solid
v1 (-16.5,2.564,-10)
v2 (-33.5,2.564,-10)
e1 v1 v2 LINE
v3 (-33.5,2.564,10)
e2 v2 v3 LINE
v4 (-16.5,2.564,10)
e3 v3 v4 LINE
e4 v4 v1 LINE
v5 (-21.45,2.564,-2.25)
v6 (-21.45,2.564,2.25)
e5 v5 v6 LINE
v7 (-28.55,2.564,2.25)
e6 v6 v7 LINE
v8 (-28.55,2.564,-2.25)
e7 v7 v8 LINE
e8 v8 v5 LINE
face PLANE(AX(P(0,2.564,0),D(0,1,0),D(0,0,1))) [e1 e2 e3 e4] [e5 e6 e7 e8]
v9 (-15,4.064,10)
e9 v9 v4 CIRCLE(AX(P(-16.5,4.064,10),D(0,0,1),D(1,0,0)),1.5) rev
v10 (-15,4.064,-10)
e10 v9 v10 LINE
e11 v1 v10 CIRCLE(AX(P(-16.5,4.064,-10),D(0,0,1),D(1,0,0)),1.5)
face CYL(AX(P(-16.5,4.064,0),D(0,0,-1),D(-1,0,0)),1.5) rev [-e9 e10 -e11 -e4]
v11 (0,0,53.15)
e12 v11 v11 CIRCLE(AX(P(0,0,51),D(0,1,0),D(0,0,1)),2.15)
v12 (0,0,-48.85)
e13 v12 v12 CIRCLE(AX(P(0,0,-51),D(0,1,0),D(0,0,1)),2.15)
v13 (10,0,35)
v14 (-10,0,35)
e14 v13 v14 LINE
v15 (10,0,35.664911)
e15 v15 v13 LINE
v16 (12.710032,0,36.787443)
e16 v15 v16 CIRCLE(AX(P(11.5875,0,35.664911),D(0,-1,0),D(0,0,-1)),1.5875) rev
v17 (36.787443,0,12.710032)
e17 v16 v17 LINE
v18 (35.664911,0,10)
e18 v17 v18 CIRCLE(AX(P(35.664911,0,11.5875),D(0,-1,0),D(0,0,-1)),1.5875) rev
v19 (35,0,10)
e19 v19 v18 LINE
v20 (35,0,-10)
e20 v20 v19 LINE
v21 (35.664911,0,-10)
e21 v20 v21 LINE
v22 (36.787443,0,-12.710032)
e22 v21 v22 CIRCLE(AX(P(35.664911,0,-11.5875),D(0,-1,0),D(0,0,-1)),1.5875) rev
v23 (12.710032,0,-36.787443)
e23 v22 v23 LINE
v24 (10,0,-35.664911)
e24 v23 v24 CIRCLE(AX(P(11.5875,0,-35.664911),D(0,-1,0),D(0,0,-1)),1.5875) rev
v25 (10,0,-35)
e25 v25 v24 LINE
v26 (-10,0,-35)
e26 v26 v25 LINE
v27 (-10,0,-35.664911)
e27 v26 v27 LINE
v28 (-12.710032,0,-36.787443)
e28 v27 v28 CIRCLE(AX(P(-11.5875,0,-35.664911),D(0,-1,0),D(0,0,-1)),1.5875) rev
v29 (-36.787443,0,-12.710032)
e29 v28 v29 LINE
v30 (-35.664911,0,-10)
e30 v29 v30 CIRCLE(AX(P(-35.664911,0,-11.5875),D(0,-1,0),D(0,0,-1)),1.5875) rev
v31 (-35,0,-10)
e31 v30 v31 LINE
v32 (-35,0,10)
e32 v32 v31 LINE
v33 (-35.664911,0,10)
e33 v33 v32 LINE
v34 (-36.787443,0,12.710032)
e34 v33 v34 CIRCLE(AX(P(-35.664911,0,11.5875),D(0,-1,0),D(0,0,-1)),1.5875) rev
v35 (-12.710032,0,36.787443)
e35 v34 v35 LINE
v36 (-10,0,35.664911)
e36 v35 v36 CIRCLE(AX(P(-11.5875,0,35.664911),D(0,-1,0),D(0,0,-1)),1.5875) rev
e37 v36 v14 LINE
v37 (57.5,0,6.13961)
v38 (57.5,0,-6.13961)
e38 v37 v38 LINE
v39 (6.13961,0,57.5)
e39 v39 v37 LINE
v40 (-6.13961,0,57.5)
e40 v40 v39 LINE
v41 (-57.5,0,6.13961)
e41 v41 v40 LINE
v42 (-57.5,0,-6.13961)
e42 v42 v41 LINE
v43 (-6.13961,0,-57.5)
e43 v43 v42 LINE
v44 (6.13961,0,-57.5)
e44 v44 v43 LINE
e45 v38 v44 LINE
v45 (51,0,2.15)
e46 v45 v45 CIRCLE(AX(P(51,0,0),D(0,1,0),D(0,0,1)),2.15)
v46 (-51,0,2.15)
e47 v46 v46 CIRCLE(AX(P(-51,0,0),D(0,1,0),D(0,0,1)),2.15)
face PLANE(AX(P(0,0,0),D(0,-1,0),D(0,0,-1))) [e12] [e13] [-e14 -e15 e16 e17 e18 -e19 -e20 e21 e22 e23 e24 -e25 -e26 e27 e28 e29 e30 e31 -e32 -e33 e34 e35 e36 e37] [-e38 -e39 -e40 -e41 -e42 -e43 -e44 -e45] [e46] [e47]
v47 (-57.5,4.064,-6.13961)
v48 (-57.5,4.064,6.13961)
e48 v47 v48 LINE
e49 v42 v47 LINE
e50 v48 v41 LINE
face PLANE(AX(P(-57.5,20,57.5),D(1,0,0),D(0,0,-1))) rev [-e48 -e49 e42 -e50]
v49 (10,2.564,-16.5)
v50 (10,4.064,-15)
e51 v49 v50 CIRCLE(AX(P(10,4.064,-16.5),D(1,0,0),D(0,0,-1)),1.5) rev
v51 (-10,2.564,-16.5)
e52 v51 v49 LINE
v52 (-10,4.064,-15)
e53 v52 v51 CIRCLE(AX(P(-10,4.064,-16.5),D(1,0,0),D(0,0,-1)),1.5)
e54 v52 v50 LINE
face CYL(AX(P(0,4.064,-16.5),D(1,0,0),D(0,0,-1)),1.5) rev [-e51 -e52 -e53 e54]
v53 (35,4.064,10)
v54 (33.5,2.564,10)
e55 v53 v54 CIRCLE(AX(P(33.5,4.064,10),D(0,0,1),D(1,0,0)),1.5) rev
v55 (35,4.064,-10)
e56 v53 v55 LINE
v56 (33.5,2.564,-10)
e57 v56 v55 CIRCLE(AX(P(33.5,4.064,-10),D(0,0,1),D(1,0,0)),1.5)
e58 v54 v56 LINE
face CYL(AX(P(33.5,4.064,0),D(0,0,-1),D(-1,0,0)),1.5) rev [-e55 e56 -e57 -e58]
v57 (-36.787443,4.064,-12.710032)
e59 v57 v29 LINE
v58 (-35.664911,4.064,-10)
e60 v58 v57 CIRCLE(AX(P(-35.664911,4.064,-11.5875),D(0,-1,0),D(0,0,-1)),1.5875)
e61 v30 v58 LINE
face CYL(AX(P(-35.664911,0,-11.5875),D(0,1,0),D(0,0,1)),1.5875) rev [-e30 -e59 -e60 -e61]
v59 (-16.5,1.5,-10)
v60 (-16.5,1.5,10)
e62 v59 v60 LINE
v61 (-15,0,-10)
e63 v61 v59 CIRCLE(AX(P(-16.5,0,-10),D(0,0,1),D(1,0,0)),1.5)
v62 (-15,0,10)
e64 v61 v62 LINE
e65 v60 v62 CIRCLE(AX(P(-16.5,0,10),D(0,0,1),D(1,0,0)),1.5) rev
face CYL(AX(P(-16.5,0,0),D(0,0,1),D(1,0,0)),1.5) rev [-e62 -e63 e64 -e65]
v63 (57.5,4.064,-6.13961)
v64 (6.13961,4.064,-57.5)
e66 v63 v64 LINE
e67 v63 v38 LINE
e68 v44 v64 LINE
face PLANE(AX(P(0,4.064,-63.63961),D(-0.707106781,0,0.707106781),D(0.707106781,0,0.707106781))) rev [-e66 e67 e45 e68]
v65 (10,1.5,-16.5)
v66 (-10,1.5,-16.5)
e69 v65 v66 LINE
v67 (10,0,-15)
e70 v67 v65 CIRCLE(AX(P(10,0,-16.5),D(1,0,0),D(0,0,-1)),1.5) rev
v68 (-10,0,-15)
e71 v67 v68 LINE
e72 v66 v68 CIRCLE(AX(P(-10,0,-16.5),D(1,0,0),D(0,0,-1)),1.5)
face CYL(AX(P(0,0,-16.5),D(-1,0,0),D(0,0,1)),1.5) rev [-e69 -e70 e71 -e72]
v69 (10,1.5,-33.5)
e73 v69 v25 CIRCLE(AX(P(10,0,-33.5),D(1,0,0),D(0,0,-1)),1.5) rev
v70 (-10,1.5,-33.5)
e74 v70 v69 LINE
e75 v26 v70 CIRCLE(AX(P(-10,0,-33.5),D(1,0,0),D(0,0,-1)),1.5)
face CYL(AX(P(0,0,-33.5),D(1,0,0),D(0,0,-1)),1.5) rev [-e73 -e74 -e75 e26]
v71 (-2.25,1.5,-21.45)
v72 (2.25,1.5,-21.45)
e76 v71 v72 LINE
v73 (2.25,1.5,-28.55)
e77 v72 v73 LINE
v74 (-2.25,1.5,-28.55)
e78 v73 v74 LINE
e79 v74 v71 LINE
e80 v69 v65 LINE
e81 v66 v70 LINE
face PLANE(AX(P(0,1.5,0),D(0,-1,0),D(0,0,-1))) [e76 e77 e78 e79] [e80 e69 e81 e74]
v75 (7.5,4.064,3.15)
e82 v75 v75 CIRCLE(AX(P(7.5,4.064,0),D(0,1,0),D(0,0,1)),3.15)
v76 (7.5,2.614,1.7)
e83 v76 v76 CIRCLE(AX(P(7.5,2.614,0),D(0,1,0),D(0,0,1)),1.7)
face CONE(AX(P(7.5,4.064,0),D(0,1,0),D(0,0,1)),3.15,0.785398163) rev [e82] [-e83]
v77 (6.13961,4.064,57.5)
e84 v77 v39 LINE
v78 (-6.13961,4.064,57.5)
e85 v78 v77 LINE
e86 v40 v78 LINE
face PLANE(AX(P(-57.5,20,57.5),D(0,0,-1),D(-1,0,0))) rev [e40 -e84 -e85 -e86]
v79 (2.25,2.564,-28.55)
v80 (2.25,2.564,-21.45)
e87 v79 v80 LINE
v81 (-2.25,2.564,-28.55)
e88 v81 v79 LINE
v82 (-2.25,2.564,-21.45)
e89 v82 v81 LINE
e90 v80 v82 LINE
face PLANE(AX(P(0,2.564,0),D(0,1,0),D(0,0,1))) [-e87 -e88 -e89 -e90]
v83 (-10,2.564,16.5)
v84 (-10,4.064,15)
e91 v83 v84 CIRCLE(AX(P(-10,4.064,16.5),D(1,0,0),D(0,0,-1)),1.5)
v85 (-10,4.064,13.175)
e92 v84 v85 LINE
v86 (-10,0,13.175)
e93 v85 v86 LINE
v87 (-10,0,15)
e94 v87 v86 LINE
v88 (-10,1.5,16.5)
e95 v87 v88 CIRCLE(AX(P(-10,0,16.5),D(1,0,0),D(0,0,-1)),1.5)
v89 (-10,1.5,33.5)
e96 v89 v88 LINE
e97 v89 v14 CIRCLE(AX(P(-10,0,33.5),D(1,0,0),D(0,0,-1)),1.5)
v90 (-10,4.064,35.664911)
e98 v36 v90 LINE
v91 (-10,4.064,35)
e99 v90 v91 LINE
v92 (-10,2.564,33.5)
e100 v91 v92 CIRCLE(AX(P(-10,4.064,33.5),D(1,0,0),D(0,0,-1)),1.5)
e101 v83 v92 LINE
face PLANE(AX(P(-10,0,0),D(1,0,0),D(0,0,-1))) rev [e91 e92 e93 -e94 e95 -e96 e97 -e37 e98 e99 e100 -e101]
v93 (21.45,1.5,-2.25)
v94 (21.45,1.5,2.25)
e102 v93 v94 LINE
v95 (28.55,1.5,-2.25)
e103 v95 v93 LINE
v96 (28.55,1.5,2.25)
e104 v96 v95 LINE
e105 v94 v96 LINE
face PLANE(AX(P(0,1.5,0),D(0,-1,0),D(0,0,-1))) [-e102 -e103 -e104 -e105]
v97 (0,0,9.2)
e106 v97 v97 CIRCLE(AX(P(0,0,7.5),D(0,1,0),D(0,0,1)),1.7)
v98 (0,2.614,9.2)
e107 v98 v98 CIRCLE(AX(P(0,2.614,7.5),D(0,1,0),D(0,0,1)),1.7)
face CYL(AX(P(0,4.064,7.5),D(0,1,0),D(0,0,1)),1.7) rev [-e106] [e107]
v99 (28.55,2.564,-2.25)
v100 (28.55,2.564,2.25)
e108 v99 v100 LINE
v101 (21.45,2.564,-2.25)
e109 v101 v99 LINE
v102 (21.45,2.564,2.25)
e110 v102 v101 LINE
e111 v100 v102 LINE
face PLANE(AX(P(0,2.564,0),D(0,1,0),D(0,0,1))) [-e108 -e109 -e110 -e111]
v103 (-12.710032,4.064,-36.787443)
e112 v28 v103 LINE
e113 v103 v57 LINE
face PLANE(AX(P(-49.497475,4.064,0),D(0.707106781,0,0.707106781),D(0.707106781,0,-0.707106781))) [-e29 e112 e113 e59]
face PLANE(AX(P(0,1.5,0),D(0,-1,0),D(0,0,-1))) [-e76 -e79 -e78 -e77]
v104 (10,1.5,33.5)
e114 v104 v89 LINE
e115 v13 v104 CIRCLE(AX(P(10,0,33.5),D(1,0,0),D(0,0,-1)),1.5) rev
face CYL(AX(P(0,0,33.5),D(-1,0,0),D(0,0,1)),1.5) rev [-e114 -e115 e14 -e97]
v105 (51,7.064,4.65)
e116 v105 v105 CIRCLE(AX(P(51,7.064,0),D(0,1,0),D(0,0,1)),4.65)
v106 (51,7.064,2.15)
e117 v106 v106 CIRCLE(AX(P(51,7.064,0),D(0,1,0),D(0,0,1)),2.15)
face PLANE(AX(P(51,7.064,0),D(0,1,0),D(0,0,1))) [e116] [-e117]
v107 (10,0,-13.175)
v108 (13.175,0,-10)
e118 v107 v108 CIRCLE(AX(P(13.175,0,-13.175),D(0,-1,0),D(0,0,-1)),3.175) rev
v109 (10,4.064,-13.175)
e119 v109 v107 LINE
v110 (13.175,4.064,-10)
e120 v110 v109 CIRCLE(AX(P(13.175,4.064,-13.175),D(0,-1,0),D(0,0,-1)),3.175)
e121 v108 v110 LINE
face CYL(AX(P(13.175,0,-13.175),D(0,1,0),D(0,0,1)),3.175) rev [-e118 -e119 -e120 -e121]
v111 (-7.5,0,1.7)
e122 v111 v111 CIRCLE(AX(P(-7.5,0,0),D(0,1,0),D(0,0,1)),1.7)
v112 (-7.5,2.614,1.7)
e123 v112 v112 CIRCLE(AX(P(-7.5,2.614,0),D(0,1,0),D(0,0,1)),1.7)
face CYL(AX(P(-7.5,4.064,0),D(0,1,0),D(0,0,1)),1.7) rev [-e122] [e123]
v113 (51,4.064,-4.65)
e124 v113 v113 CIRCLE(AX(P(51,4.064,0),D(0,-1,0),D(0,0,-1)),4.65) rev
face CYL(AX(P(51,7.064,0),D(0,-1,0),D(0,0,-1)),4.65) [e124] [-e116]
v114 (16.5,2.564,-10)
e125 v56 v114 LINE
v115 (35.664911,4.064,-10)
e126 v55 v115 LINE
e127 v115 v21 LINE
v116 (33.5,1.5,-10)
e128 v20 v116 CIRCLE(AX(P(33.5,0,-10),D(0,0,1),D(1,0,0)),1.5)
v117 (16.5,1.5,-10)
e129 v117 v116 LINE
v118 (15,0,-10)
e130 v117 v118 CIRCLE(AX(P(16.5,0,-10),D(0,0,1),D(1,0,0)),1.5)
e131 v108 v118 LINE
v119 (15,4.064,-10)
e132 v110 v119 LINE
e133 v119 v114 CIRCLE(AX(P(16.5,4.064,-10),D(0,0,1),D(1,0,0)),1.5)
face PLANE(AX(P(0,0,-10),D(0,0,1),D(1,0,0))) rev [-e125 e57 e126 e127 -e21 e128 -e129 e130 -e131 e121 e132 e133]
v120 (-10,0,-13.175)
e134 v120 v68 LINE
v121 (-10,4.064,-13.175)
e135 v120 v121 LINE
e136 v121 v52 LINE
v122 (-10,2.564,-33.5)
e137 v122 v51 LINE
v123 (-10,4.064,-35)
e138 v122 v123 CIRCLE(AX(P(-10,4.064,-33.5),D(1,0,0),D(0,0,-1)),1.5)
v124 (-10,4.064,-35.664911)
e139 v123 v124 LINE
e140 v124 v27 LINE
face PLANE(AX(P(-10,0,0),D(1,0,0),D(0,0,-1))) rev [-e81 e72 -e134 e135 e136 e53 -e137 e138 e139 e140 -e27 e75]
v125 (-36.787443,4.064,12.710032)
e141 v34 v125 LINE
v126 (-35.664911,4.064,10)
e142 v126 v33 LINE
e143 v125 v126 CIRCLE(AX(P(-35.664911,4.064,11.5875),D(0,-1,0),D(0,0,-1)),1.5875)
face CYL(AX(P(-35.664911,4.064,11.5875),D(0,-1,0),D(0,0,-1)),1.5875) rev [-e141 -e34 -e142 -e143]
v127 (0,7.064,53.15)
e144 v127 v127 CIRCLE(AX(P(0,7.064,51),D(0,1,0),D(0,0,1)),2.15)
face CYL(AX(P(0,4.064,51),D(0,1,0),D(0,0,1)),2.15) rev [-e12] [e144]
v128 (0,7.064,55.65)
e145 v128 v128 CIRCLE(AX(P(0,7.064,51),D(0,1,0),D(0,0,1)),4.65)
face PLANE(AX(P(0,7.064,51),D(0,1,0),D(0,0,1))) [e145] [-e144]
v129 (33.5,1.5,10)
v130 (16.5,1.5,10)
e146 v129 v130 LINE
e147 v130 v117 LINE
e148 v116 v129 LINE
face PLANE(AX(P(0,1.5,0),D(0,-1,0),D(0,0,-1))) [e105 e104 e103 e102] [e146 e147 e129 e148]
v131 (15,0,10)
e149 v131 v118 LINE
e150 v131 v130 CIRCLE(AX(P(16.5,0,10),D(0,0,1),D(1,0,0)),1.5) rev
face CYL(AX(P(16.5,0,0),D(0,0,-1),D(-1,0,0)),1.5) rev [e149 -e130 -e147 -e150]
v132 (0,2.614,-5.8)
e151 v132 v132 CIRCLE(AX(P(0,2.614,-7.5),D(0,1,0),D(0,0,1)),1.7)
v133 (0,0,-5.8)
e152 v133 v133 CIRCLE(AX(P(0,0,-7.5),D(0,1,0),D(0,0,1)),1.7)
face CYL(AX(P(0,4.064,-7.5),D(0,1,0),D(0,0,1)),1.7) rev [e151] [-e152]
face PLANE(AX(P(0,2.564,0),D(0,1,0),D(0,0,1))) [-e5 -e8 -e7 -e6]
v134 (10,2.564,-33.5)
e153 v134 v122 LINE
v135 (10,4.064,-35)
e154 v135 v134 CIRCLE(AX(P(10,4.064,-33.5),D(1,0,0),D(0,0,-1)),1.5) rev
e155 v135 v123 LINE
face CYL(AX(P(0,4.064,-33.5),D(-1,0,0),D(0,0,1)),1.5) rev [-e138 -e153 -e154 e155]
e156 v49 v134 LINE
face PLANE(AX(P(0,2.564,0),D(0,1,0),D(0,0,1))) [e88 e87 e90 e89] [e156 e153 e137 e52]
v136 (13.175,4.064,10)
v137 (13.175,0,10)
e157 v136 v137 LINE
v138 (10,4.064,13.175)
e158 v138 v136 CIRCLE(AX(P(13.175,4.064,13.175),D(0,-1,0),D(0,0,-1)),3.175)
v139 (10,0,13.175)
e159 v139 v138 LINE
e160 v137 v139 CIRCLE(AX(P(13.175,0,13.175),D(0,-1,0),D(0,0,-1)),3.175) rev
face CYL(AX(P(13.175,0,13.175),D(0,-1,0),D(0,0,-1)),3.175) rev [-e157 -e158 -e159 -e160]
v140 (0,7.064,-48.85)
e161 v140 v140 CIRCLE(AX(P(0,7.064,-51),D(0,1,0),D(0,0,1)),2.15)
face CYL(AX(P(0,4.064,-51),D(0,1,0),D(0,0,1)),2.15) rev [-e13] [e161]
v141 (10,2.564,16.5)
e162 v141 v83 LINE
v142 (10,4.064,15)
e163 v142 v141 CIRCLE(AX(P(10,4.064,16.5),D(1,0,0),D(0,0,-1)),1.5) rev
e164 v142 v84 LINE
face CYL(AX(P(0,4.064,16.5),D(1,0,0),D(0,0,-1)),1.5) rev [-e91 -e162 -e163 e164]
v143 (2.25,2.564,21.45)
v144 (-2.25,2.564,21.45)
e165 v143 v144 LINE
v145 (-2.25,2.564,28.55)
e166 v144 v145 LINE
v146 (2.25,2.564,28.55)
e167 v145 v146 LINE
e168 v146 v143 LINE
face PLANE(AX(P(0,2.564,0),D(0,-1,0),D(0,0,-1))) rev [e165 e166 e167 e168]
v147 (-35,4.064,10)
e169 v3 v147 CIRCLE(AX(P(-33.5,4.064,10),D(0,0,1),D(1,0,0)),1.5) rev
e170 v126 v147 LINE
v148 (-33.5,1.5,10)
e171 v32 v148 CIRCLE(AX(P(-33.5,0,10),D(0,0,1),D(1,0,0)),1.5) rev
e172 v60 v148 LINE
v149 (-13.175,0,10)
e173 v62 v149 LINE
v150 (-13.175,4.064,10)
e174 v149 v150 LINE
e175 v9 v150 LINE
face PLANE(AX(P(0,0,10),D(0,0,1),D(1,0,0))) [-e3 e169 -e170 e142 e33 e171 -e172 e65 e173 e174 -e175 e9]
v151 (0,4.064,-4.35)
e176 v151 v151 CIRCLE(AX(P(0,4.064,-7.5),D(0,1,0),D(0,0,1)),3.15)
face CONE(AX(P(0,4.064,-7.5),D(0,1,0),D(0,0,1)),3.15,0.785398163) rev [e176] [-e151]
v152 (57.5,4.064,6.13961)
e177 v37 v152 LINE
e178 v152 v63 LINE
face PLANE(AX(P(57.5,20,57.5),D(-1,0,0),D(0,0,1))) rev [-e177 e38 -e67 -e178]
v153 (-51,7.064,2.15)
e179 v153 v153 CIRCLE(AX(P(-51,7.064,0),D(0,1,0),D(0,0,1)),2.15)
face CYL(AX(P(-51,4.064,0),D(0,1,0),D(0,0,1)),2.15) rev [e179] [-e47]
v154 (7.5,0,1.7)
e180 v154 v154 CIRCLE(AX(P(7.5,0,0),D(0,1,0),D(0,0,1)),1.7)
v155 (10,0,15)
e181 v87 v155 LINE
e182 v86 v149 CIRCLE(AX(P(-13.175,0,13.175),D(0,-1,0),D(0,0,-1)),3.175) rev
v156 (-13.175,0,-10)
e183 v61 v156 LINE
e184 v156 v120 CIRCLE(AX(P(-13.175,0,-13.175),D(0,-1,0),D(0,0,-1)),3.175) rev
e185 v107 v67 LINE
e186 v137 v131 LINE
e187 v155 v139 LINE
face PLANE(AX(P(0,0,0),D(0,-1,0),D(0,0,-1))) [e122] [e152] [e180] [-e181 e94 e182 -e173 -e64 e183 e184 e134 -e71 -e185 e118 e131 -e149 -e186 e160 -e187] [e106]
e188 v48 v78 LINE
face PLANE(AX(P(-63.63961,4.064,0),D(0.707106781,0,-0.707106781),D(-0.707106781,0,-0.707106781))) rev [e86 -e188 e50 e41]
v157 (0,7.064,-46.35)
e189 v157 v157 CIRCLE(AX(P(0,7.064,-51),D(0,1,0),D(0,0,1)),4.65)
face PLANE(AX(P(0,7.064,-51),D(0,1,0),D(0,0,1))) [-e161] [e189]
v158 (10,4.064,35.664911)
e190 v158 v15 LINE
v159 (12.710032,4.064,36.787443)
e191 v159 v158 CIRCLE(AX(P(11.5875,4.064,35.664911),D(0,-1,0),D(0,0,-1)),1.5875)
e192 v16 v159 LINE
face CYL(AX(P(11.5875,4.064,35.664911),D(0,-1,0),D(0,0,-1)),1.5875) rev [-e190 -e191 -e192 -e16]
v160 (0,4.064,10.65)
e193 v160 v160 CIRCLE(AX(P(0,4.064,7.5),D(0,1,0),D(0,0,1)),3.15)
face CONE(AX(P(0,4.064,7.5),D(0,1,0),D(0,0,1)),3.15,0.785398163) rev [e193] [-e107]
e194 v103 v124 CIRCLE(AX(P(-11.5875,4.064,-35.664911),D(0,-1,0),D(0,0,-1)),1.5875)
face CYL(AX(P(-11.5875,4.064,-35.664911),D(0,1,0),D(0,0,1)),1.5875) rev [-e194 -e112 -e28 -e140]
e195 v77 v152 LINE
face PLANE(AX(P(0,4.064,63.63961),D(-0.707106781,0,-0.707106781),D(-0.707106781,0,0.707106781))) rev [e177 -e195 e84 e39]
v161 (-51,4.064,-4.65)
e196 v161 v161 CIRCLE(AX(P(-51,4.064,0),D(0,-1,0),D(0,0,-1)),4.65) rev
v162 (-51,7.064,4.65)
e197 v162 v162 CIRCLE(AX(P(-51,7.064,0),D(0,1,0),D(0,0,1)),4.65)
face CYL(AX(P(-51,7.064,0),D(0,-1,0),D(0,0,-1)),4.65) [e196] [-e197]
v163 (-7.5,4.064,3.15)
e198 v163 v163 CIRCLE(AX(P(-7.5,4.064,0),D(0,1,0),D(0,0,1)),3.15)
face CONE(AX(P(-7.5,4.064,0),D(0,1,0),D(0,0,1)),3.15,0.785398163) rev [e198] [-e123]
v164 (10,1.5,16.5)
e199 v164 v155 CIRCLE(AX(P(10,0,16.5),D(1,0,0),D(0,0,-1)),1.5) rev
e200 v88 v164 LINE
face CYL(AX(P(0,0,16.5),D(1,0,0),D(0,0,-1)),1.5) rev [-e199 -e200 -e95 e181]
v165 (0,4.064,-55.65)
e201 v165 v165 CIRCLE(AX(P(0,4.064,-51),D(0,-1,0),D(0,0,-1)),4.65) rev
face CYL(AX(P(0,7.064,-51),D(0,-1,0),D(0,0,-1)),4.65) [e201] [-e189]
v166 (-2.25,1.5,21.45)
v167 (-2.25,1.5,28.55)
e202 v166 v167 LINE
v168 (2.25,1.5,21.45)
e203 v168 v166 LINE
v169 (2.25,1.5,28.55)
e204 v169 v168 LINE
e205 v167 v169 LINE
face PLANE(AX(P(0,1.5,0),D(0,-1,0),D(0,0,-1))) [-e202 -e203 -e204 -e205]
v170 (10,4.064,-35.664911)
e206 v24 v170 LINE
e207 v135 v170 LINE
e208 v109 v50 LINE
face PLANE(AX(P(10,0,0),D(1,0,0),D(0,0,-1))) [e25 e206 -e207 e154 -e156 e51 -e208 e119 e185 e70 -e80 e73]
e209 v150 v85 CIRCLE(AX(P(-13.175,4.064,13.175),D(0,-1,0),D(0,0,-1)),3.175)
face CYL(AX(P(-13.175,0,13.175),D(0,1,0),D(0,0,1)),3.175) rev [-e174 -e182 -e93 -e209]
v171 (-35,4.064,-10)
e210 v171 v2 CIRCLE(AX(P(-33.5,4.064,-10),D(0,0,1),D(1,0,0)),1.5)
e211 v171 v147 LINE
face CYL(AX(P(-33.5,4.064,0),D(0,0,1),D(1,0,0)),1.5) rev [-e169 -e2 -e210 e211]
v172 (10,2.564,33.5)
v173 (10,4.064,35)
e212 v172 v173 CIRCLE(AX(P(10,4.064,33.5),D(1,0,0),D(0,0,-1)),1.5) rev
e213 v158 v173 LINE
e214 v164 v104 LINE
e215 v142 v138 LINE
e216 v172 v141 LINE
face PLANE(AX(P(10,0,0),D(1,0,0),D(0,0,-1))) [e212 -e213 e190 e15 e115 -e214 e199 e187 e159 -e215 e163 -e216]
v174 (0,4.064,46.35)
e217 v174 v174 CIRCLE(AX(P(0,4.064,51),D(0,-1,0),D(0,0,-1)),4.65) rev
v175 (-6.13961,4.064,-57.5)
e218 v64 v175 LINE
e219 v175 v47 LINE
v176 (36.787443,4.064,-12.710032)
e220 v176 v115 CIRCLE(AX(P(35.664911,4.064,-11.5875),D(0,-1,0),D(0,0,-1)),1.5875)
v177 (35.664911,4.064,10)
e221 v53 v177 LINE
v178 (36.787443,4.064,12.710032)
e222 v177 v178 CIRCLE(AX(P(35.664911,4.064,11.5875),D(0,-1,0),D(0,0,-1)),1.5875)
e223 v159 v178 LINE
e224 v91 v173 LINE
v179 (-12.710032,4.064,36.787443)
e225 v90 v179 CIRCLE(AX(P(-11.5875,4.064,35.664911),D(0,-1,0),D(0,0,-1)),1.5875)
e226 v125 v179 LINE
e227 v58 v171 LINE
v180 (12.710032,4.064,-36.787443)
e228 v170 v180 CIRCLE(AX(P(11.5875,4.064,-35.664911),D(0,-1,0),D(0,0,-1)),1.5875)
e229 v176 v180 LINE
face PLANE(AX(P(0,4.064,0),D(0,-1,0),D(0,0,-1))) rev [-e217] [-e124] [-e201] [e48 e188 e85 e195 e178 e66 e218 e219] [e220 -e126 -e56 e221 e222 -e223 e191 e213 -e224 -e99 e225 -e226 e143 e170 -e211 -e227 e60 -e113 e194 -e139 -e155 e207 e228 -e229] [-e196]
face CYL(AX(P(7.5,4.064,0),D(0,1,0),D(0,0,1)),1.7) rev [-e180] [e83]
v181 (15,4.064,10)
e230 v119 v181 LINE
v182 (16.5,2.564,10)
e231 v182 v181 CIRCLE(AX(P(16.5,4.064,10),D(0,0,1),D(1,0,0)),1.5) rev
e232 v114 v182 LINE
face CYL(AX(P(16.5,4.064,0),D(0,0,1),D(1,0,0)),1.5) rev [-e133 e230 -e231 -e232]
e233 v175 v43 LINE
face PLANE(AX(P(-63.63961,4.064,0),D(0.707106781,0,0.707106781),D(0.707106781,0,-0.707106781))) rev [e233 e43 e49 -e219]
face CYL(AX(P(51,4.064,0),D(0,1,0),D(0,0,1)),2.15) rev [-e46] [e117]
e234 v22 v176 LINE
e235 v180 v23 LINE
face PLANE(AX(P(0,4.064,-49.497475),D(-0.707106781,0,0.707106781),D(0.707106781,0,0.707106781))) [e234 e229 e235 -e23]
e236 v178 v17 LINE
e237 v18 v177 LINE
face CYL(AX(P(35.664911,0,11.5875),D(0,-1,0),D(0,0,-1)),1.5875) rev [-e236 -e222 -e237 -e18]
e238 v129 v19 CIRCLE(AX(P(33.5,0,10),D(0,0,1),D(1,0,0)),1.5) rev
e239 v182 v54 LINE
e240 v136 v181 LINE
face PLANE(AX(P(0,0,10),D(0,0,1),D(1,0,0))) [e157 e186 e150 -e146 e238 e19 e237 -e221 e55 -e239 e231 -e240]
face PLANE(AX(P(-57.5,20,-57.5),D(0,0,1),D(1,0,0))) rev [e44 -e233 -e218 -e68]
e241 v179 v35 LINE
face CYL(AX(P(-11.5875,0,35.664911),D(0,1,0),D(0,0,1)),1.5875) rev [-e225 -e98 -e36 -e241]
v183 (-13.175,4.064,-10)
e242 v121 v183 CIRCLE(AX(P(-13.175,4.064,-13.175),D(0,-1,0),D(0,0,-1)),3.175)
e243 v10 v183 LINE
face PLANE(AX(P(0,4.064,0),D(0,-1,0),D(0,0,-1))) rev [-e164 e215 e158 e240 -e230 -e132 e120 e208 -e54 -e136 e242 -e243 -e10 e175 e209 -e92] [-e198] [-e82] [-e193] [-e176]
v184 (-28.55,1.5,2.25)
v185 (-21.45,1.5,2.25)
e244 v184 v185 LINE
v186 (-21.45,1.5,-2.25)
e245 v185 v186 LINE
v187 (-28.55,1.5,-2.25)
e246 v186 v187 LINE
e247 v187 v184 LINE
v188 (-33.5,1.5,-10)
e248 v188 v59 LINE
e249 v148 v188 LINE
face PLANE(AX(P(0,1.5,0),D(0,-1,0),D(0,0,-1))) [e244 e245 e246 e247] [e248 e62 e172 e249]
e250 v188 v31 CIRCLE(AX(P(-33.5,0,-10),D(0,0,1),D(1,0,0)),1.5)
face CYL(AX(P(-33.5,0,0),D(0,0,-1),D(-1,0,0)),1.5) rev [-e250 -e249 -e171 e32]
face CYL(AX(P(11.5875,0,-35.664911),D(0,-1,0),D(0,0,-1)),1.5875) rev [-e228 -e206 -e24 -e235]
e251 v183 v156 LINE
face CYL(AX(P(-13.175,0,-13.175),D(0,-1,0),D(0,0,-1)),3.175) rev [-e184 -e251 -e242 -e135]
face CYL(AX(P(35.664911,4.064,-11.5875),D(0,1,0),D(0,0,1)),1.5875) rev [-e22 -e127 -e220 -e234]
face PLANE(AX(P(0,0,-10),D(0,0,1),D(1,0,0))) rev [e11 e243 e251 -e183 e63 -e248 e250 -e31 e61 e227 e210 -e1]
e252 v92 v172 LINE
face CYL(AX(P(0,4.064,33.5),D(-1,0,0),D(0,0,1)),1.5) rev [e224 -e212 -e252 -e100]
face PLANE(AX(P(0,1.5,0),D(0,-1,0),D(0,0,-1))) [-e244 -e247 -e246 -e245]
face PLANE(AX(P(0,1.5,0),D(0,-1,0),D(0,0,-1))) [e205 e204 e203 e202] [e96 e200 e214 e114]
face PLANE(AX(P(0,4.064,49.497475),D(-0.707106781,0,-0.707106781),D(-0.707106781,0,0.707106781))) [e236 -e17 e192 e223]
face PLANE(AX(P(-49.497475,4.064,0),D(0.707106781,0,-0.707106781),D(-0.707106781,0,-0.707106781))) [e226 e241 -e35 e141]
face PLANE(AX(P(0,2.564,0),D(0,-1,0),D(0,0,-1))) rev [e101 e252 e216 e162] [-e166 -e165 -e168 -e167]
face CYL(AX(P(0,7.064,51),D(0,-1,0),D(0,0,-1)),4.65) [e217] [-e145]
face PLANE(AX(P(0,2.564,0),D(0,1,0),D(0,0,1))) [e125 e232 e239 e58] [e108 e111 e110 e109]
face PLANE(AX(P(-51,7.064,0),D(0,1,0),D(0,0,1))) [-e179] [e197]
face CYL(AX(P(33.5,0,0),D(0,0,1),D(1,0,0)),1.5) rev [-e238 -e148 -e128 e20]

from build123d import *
from OCP.BRepFilletAPI import BRepFilletAPI_MakeFillet

# Parameters (mm, degrees)
MOUNTING_BASE_DEPTH                             = 4.064
LOAD_CELL_ARMS_DEPTH                            = 4.064
M4_CLEARANCE_HOLE1_D                            = 4.3
FILLET1_R1                                      = 3.175
FILLET1_R2                                      = 1.5875
SKETCH15_R                                      = 4.65
SKETCH15_R_2                                    = 2.15
BOSS_EXTRUDE2_DEPTH                             = 3
SKETCH12_OUTSIDE_W                              = 165.308
SKETCH12_OUTSIDE_H                              = 165.308
SKETCH12_OUTSIDE_W_2                            = 115
SKETCH12_OUTSIDE_H_2                            = 115
CUT_EXTRUDE2_DEPTH                              = 20
CSK_FOR_M3_FLAT_HEAD_MACHINE_SCREW1_D           = 3.4
CSK_FOR_M3_FLAT_HEAD_MACHINE_SCREW1_CSINK_D     = 6.3
CSK_FOR_M3_FLAT_HEAD_MACHINE_SCREW1_CSINK_ANGLE = 90
SKETCH14_W                                      = 20
SKETCH14_H                                      = 20
CUT_EXTRUDE3_DEPTH                              = 1.5
CUT_EXTRUDE4_START                              = -4.064
SKETCH14_2_W                                    = 20
SKETCH14_2_H                                    = 20
CUT_EXTRUDE4_DEPTH                              = 1.5
FILLET2_R                                       = 1.5


with BuildPart() as part:
    # Sketch1 → Mounting base (new body)
    with BuildSketch(Plane(origin=(0, 0, 0), x_dir=(1, 0, 0), z_dir=(0, 1, 0))):
        Polygon((-63.639610307, 0), (0, -63.639610307), (63.639610307, 0), (0, 63.639610307), align=None)
        Polygon((-49.497474683, 0), (0, 49.497474683), (49.497474683, 0), (0, -49.497474683), align=None, mode=Mode.SUBTRACT)
    extrude(amount=MOUNTING_BASE_DEPTH)

    # Sketch2 → load cell arms (add, through all)
    with BuildSketch(Plane(origin=(0, 4.064, 0), x_dir=(1, 0, 0), z_dir=(0, 1, 0))):
        Polygon((-49.497474683, 10), (-49.497474683, -10), (-10, -10), (-10, -49.497474683), (10, -49.497474683), (10, -10), (49.497474683, -10), (49.497474683, 10), (10, 10), (10, 49.497474683), (-10, 49.497474683), (-10, 10), align=None)
    extrude(amount=-LOAD_CELL_ARMS_DEPTH)

    # M4 Clearance Hole1 (through all)
    with Locations(Plane(origin=(0, 4.064, 0), x_dir=(1, 0, 0), z_dir=(0, 1, 0))):
        with Locations((-51, 0), (0, 51), (51, 0), (0, -51)):
            Hole(M4_CLEARANCE_HOLE1_D / 2)

    # Fillet1: one fillet with a radius per group of edges: ONE call of the kernel's fillet builder (fillet() takes one radius for all edges)
    fillet1_edges_1 = [part.edges().sort_by_distance(p)[0] for p in [
        (-10, 2.032, 10),
        (-10, 2.032, -10),
        (10, 2.032, -10),
        (10, 2.032, 10),
    ]]
    fillet1_edges_2 = [part.edges().sort_by_distance(p)[0] for p in [
        (-39.497474683, 2.032, -10),
        (-39.497474683, 2.032, 10),
        (-10, 2.032, 39.497474683),
        (10, 2.032, 39.497474683),
        (39.497474683, 2.032, 10),
        (39.497474683, 2.032, -10),
        (10, 2.032, -39.497474683),
        (-10, 2.032, -39.497474683),
    ]]
    fillet1 = BRepFilletAPI_MakeFillet(part.part.solid().wrapped)
    for e in fillet1_edges_1:
        fillet1.Add(FILLET1_R1, e.wrapped)
    for e in fillet1_edges_2:
        fillet1.Add(FILLET1_R2, e.wrapped)
    add(Compound.cast(fillet1.Shape()), mode=Mode.REPLACE)

    # Sketch15 → Boss-Extrude2 (add)
    # profile 1 of 4: a face of its own
    with BuildSketch(Plane(origin=(0, 4.064, 0), x_dir=(1, 0, 0), z_dir=(0, 1, 0))):
        with Locations(Location((0, -51, 0), (0, 0, 90))):
            Circle(SKETCH15_R)
        with Locations(Location((0, -51, 0), (0, 0, 270))):
            Circle(SKETCH15_R_2, mode=Mode.SUBTRACT)
    # profile 2 of 4: a face of its own
    with BuildSketch(Plane(origin=(0, 4.064, 0), x_dir=(1, 0, 0), z_dir=(0, 1, 0))):
        with Locations(Location((-51, 0, 0), (0, 0, 90))):
            Circle(SKETCH15_R)
        with Locations(Location((-51, 0, 0), (0, 0, 270))):
            Circle(SKETCH15_R_2, mode=Mode.SUBTRACT)
    # profile 3 of 4: a face of its own
    with BuildSketch(Plane(origin=(0, 4.064, 0), x_dir=(1, 0, 0), z_dir=(0, 1, 0))):
        with Locations(Location((0, 51, 0), (0, 0, 90))):
            Circle(SKETCH15_R)
        with Locations(Location((0, 51, 0), (0, 0, 270))):
            Circle(SKETCH15_R_2, mode=Mode.SUBTRACT)
    # profile 4 of 4: a face of its own
    with BuildSketch(Plane(origin=(0, 4.064, 0), x_dir=(1, 0, 0), z_dir=(0, 1, 0))):
        with Locations(Location((51, 0, 0), (0, 0, 90))):
            Circle(SKETCH15_R)
        with Locations(Location((51, 0, 0), (0, 0, 270))):
            Circle(SKETCH15_R_2, mode=Mode.SUBTRACT)
    extrude(amount=BOSS_EXTRUDE2_DEPTH)

    # Sketch12 outside → Cut-Extrude2 (cut)
    with BuildSketch(Plane(origin=(0, 0, 0), x_dir=(1, 0, 0), z_dir=(0, 1, 0))):
        Rectangle(SKETCH12_OUTSIDE_W, SKETCH12_OUTSIDE_H)
        Rectangle(SKETCH12_OUTSIDE_W_2, SKETCH12_OUTSIDE_H_2, mode=Mode.SUBTRACT)
    extrude(amount=CUT_EXTRUDE2_DEPTH, mode=Mode.SUBTRACT)

    # CSK for M3 Flat Head Machine Screw1 (through all)
    with Locations(Plane(origin=(0, 4.064, -7.5), x_dir=(0, 0, 1), z_dir=(0, 1, 0))):
        with Locations((0, 0), (7.5, 7.5), (15, 0), (7.5, -7.5)):
            CounterSinkHole(CSK_FOR_M3_FLAT_HEAD_MACHINE_SCREW1_D / 2, CSK_FOR_M3_FLAT_HEAD_MACHINE_SCREW1_CSINK_D / 2, counter_sink_angle=CSK_FOR_M3_FLAT_HEAD_MACHINE_SCREW1_CSINK_ANGLE)

    # Sketch14 → Cut-Extrude3 (cut)
    with BuildSketch(Plane(origin=(0, 4.064, 0), x_dir=(1, 0, 0), z_dir=(0, 1, 0))):
        with Locations((-25, 0)):
            Rectangle(SKETCH14_W, SKETCH14_H)
        with Locations((0, 25)):
            Rectangle(SKETCH14_W, SKETCH14_H)
        with Locations((25, 0)):
            Rectangle(SKETCH14_W, SKETCH14_H)
        with Locations((0, -25)):
            Rectangle(SKETCH14_W, SKETCH14_H)
    extrude(amount=-CUT_EXTRUDE3_DEPTH, mode=Mode.SUBTRACT)

    # Sketch14<2> → Cut-Extrude4 (cut)
    with BuildSketch(Plane(origin=(0, 4.064, 0), x_dir=(1, 0, 0), z_dir=(0, 1, 0)).offset(CUT_EXTRUDE4_START)):
        with Locations((-25, 0)):
            Rectangle(SKETCH14_2_W, SKETCH14_2_H)
        with Locations((0, 25)):
            Rectangle(SKETCH14_2_W, SKETCH14_2_H)
        with Locations((25, 0)):
            Rectangle(SKETCH14_2_W, SKETCH14_2_H)
        with Locations((0, -25)):
            Rectangle(SKETCH14_2_W, SKETCH14_2_H)
    extrude(amount=CUT_EXTRUDE4_DEPTH, mode=Mode.SUBTRACT)

    # Fillet2
    fillet2_edges = [part.edges().sort_by_distance(p)[0] for p in [
        (0, 2.564, 35),
        (0, 2.564, 15),
        (0, 1.5, 15),
        (0, 1.5, 35),
        (15, 1.5, 0),
        (35, 1.5, 0),
        (0, 1.5, -15),
        (-15, 1.5, 0),
        (-35, 1.5, 0),
        (0, 1.5, -35),
        (15, 2.564, 0),
        (35, 2.564, 0),
        (0, 2.564, -35),
        (0, 2.564, -15),
        (-15, 2.564, 0),
        (-35, 2.564, 0),
    ]]
    fillet(fillet2_edges, radius=FILLET2_R - 0.0001)  # a hair under: the kernel refuses the full size


solid = part.part
